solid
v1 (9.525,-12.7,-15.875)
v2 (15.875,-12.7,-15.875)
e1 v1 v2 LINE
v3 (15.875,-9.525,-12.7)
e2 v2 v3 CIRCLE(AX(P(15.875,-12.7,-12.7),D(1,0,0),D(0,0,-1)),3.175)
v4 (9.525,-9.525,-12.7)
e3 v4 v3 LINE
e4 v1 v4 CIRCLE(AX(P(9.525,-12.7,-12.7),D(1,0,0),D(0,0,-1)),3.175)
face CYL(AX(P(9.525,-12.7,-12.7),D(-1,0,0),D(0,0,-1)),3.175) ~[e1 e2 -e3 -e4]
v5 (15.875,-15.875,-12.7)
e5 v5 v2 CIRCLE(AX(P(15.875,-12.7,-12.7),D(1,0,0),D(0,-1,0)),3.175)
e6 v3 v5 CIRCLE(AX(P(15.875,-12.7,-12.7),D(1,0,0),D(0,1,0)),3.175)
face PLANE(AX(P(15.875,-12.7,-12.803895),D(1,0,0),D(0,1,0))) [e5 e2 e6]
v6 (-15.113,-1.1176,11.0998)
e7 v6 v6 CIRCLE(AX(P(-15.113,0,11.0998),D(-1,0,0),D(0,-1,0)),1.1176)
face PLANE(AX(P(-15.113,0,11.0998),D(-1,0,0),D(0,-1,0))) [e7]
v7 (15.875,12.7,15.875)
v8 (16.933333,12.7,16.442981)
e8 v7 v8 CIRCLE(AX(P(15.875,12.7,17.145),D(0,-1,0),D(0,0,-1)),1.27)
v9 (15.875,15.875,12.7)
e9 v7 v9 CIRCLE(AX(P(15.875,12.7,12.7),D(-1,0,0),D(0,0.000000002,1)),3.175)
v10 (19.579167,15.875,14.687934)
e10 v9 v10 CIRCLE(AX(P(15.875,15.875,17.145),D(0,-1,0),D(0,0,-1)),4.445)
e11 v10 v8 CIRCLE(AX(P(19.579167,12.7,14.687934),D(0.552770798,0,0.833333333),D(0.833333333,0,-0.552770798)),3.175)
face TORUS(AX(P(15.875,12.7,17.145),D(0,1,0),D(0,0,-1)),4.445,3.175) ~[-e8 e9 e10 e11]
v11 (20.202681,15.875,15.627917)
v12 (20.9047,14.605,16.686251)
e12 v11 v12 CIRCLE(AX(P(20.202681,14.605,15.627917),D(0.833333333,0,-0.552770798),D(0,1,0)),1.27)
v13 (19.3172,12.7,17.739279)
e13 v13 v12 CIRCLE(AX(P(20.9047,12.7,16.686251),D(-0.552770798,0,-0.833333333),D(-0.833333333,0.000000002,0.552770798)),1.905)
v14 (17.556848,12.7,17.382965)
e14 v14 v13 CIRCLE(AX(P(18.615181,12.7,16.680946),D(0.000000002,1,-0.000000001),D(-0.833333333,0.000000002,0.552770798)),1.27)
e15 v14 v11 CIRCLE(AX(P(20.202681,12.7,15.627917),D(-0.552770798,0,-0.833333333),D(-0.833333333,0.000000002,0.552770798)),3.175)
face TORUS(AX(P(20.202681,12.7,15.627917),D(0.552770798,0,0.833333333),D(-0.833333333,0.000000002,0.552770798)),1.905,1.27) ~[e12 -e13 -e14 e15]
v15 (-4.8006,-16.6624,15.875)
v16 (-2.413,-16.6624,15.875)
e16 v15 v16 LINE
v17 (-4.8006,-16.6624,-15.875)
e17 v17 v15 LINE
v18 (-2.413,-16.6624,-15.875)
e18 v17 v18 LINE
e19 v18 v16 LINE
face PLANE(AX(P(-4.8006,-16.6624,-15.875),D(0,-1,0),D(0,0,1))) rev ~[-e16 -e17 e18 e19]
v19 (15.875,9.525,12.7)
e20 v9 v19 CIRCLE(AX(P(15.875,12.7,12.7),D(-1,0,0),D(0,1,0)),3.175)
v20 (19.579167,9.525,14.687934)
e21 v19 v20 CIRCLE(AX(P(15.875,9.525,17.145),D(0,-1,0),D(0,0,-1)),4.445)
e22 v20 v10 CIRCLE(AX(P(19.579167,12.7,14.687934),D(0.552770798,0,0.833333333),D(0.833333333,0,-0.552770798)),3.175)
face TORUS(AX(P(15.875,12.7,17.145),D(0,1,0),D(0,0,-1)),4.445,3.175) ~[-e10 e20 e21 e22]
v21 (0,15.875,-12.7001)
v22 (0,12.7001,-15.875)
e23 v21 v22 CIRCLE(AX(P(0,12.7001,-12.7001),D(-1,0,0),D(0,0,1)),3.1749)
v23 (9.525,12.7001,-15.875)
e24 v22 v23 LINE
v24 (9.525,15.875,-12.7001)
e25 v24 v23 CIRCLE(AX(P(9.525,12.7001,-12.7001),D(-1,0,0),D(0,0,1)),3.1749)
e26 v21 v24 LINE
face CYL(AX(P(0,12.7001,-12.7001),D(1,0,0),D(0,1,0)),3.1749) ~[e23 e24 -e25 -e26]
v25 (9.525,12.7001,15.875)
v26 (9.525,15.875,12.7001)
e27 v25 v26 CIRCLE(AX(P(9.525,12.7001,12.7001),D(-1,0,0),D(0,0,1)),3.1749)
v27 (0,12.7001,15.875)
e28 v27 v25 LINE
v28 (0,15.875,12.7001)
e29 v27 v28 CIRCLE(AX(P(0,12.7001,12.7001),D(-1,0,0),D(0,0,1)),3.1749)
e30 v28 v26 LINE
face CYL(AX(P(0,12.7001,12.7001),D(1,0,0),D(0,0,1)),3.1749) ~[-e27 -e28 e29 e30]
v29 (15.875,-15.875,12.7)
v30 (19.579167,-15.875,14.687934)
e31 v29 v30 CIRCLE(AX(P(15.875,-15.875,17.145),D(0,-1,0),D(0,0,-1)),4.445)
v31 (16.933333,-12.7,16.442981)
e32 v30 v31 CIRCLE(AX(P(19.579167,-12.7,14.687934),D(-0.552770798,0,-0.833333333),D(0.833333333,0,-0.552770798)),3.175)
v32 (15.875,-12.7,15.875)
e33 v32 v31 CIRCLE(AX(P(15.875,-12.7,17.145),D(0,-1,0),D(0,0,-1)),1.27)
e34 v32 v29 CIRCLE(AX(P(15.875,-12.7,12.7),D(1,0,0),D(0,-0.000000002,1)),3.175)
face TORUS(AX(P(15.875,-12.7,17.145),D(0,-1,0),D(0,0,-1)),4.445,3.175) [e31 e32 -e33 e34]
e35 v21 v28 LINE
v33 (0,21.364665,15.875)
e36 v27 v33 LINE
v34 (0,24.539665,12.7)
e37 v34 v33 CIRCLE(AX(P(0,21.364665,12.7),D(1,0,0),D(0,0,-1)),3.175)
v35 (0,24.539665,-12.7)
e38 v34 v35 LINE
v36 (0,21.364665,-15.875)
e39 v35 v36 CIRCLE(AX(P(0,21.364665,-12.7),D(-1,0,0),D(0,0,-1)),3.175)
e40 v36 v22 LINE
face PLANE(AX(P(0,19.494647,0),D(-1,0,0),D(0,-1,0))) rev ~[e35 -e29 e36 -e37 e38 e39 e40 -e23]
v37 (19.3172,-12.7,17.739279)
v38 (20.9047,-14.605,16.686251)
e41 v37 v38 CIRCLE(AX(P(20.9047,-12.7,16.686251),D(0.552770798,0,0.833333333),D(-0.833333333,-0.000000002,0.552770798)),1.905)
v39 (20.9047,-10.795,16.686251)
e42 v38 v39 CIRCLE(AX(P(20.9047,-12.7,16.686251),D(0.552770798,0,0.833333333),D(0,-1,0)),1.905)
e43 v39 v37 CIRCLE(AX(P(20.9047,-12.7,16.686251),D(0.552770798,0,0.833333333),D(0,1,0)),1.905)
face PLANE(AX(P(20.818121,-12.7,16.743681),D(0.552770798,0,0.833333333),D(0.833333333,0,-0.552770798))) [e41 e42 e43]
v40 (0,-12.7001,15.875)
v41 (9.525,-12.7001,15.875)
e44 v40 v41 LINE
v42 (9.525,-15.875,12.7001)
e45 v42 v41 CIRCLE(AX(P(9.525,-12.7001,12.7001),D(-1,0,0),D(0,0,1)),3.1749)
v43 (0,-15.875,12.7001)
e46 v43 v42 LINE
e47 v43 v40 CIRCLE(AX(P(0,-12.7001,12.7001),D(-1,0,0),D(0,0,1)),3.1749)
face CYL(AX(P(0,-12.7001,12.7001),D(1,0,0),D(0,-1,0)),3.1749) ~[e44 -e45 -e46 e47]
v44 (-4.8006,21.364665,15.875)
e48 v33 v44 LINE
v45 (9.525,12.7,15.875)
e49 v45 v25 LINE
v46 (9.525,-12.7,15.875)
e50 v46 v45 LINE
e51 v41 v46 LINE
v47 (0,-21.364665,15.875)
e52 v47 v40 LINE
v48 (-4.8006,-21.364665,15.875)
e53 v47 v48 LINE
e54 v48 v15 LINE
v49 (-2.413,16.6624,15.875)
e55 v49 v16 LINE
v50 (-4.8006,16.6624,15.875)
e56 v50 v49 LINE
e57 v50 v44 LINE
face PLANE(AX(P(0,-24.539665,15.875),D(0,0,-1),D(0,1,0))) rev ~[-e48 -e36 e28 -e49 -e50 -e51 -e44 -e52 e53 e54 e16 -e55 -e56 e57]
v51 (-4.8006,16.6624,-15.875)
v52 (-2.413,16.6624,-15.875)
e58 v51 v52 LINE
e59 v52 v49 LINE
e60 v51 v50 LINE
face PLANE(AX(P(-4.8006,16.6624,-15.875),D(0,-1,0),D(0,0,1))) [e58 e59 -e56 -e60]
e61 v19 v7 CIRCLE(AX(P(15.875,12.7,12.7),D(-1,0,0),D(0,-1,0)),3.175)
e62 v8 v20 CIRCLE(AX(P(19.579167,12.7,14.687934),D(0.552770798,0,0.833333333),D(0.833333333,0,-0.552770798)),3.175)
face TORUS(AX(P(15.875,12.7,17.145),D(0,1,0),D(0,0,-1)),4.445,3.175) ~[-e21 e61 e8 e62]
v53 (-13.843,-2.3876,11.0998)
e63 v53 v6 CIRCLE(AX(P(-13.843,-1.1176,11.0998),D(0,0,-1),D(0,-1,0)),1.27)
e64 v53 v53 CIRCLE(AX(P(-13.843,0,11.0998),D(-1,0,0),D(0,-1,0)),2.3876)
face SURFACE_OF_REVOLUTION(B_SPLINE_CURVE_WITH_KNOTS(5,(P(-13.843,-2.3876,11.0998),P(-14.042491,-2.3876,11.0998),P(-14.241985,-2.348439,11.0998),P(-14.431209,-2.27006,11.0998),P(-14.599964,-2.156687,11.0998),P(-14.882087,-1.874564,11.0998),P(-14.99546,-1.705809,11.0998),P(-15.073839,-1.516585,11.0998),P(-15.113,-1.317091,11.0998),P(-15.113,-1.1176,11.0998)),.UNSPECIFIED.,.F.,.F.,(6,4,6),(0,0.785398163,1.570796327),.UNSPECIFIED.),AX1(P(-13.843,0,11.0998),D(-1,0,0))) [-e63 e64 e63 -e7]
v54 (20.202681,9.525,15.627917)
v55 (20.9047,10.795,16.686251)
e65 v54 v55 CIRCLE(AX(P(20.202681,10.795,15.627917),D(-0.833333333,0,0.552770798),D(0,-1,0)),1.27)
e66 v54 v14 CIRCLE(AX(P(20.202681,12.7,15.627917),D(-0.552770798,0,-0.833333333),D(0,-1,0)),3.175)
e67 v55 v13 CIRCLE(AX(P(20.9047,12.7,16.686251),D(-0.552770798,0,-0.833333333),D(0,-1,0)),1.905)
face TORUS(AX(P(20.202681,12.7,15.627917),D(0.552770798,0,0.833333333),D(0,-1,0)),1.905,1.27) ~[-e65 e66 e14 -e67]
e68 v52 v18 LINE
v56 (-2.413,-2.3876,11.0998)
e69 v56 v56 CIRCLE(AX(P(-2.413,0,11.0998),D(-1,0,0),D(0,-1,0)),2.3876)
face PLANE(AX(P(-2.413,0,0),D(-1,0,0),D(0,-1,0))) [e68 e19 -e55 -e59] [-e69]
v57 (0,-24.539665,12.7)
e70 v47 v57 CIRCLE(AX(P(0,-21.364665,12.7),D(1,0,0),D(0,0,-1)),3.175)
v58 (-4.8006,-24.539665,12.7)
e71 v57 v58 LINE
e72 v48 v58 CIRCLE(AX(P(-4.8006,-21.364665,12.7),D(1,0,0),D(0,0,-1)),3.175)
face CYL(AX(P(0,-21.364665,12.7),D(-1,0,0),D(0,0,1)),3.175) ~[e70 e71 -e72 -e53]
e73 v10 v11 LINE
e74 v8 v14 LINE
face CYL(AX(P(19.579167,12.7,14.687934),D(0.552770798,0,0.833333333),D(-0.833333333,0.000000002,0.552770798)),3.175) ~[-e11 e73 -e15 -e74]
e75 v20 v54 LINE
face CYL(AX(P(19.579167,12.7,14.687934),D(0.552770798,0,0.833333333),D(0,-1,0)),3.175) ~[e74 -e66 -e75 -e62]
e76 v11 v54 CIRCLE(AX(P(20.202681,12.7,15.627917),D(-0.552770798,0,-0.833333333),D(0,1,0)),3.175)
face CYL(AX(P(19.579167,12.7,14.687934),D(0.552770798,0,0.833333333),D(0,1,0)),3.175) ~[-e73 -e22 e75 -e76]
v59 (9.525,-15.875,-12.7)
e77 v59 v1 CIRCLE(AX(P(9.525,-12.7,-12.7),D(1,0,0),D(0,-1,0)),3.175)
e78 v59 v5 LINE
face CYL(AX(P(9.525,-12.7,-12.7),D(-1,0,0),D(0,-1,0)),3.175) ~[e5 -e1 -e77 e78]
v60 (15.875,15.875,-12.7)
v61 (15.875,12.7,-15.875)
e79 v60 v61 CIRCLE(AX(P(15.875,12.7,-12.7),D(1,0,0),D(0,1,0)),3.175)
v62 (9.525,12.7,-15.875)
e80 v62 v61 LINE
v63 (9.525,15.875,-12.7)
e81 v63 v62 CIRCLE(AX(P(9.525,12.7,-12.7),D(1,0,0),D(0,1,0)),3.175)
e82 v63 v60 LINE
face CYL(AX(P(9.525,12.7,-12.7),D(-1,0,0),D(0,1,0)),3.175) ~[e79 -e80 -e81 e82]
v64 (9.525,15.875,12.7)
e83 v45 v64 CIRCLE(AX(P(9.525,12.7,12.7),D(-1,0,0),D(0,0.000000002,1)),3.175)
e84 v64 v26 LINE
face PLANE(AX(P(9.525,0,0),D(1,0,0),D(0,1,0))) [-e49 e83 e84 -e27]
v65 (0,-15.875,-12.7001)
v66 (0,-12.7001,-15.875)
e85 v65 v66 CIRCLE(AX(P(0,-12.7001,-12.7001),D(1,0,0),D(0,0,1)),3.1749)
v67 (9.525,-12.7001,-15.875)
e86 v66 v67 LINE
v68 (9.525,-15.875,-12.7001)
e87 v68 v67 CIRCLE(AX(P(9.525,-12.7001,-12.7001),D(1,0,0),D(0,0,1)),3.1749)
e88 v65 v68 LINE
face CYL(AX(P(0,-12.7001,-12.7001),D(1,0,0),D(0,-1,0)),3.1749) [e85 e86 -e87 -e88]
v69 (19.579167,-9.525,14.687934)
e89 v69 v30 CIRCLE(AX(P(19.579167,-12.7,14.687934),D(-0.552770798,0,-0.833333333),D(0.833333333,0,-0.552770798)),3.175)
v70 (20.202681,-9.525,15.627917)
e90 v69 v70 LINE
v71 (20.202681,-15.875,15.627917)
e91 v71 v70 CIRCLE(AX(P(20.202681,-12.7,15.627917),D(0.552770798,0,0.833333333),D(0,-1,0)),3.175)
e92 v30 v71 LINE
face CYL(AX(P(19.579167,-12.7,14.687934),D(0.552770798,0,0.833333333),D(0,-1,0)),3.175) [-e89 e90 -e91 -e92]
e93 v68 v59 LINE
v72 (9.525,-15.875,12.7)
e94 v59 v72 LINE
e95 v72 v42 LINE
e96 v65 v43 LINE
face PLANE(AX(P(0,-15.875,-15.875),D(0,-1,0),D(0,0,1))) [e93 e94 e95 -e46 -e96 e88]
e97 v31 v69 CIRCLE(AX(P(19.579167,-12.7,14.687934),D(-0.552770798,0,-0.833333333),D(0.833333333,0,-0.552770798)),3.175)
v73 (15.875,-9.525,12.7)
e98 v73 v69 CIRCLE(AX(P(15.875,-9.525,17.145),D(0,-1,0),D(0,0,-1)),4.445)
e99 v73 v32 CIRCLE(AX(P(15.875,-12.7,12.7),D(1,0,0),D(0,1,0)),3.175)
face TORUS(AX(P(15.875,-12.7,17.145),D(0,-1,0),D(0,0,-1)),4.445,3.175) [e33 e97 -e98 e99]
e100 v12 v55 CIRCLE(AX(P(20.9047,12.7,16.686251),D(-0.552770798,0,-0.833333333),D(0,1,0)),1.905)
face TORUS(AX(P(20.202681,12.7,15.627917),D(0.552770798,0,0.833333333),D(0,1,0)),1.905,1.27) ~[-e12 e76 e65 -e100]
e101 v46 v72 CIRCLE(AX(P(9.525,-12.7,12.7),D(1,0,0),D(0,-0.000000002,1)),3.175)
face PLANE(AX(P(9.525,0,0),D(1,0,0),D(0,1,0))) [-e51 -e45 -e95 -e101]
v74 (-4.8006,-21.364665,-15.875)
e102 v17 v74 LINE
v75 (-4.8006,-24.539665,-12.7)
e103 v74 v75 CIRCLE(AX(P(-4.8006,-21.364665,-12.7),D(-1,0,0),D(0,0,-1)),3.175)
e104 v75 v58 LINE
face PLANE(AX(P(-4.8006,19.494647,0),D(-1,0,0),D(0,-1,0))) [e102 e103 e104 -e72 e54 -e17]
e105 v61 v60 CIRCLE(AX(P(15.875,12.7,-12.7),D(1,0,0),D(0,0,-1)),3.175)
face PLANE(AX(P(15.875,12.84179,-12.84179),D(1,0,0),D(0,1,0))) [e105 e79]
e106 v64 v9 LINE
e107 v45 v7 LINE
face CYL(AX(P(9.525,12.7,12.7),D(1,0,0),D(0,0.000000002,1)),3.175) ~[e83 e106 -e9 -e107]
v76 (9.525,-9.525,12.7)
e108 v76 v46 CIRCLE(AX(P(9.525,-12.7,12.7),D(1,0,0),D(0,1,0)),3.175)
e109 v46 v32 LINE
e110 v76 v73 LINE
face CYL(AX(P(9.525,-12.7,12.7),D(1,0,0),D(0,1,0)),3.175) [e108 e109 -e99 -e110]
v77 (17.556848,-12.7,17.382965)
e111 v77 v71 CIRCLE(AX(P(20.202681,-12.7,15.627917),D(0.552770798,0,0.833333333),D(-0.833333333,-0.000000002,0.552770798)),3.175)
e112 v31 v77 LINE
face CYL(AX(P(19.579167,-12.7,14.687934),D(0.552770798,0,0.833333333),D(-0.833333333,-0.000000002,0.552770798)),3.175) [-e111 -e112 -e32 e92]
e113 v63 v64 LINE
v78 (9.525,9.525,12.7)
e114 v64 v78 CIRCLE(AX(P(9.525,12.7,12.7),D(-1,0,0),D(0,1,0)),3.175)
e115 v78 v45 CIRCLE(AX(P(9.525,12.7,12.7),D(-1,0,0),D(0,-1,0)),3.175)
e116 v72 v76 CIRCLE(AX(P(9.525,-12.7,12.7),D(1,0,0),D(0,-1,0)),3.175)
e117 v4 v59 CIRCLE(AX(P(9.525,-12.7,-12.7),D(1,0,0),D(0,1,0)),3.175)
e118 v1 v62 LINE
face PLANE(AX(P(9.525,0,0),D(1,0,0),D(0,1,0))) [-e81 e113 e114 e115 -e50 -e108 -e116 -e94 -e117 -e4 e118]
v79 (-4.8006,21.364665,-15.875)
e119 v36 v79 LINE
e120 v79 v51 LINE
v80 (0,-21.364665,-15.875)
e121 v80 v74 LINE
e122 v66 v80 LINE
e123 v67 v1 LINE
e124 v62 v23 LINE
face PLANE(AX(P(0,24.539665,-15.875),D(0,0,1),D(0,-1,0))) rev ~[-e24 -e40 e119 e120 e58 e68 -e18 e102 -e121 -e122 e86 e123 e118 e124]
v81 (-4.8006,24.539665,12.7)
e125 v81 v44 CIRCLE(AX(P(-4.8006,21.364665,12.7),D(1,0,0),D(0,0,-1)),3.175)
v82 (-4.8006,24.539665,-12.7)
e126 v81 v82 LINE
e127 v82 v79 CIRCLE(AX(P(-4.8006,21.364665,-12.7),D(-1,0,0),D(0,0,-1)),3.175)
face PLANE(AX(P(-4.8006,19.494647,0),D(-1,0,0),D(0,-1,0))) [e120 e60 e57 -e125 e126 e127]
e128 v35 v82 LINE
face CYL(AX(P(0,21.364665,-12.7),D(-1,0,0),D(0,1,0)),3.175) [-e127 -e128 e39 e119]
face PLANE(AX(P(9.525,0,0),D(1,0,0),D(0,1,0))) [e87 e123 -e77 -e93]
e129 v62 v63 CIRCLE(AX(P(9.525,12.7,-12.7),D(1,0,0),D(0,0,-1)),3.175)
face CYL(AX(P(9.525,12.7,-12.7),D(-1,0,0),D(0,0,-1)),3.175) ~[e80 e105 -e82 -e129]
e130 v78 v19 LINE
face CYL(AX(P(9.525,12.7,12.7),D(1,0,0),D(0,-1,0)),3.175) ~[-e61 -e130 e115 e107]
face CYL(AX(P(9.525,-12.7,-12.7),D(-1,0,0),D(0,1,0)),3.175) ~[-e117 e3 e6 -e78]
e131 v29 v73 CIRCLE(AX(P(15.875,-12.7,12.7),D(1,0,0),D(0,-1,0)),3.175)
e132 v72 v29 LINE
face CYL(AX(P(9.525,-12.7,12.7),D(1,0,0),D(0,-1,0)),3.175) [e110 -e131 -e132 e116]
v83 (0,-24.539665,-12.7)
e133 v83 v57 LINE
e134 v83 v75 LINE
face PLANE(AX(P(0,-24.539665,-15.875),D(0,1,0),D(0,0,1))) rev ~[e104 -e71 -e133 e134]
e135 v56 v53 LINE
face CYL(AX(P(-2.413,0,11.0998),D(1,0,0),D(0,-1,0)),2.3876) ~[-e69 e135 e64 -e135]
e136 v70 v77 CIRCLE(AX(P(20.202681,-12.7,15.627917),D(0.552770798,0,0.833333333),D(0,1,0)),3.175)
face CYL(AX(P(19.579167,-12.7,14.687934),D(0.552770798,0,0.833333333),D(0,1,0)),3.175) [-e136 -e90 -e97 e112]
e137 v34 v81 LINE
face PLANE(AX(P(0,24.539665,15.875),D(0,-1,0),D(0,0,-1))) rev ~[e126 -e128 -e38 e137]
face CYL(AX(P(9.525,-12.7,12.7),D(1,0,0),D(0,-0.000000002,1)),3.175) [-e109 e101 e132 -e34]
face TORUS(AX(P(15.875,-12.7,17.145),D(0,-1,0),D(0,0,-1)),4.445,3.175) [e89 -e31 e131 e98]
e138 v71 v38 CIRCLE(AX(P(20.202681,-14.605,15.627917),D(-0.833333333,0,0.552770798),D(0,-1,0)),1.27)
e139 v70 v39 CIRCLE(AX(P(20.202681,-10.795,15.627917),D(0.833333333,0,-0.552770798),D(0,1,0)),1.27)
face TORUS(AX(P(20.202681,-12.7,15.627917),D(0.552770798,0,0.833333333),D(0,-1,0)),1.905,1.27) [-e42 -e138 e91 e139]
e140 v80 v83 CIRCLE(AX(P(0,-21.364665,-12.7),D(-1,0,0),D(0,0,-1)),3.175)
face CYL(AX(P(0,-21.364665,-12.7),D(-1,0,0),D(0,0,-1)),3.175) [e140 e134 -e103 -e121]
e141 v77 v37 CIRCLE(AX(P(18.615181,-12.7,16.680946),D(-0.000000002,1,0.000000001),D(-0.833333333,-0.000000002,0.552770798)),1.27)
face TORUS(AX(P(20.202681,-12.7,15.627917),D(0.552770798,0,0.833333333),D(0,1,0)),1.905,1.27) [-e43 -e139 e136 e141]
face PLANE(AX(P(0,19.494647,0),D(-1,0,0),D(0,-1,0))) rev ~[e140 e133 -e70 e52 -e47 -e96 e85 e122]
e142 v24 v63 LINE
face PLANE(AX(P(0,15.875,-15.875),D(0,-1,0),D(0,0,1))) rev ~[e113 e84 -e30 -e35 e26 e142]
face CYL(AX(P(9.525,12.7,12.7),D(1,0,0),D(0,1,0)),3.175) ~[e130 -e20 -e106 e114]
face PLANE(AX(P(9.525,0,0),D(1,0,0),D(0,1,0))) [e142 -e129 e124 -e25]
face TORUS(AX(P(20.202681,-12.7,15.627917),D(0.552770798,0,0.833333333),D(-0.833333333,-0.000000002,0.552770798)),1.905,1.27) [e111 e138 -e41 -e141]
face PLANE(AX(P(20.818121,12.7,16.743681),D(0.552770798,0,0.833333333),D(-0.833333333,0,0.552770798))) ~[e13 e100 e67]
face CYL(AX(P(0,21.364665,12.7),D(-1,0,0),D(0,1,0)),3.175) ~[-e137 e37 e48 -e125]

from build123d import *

# Parameters (mm, degrees)
F0_W      = 31.75
F0_H      = 31.75
F1_DEPTH  = 9.525
F7_R      = 1.27
F11_DEPTH = 6.35
F12_R     = 3.1749
F14_DEPTH = 4.8006
F15_W     = 33.3248
F15_H     = 31.75
F16_DEPTH = 2.3876
F17_R     = 2.3876
F18_DEPTH = 12.7
F19_R     = 3.175
F20_R     = 1.27


# Not quite as in the source:
# - a fillet or chamfer is up to 0.001 mm smaller than in the source, because OpenCascade refuses the exact size


with BuildPart() as f1:
    # F0 (on Right) → F1 (new body)
    with BuildSketch(Plane.YZ):
        Rectangle(F0_W, F0_H)
    extrude(amount=F1_DEPTH)

    # F6: sweep along a path in F5
    with BuildLine(Plane.XZ.offset(12.7)) as f6_path:
        Line((9.525, 9.525), (15.875, 9.525))
        ThreePointArc((15.875, 9.525), (19.4783384003, 10.4308096264), (22.225, 12.9328865162))
        Line((22.225, 12.9328865162), (23.5505334947, 14.9312034475))
    # F2 (on face) → F6 (sweep)
    with BuildSketch(Plane.YZ.offset(9.525)):
        with BuildLine():
            ThreePointArc((-15.875, 12.7), (-12.7, 9.525), (-9.525, 12.7))
            ThreePointArc((-9.525, 12.7), (-10.4549359718, 14.9450640323), (-12.7000000057, 15.875))
            ThreePointArc((-12.7000000057, 15.875), (-14.9450640323, 14.9450640282), (-15.875, 12.7))
        make_face()
    sweep(path=f6_path.line)

    # F7
    f7_edges = [f1.edges().sort_by_distance(p)[0] for p in [
        (20.9047, -15.875, 16.686251),
    ]]
    fillet(f7_edges, radius=F7_R)

    # F10: F1 across plane


with BuildPart() as f1_1:
    add(f1.part)
    add(f1.part.mirror(Plane(origin=(0, 0, 15.875), x_dir=(1, 0, 0), z_dir=(0, -1, 0))))

    # F2 (on face) → F11 (join)
    with BuildSketch(Plane.YZ.offset(9.525)):
        with BuildLine():
            ThreePointArc((-9.525, -12.7), (-12.7, -9.525), (-15.875, -12.7))
            ThreePointArc((-15.875, -12.7), (-14.9450640303, -14.9450640303), (-12.7, -15.875))
            ThreePointArc((-12.7, -15.875), (-10.4549359697, -14.9450640303), (-9.525, -12.7))
        make_face()
        with BuildLine():
            ThreePointArc((12.7, -15.875), (14.9450640303, -14.9450640303), (15.875, -12.7))
            ThreePointArc((15.875, -12.7), (10.4549359697, -10.4549359697), (12.7, -15.875))
        make_face()
    extrude(amount=F11_DEPTH)

    # F12 (radius 3.175 in the source; OpenCascade refuses exactly that, so slightly less here)
    f12_edges = [f1_1.edges().sort_by_distance(p)[0] for p in [
        (4.7625, -15.875, 15.875),
        (4.7625, -15.875, -15.875),
        (4.7625, 15.875, -15.875),
        (4.7625, 15.875, 15.875),
    ]]
    fillet(f12_edges, radius=F12_R)

    # F13 (on face) → F14 (join)
    with BuildSketch(Plane(origin=(0, 0, 0), x_dir=(0, -1, 0), z_dir=(-1, 0, 0))):
        with BuildLine():
            Line((-12.7001, 15.875), (-24.5396645936, 15.875))
            Line((-24.5396645936, 15.875), (-24.5396645936, -15.875))
            Line((-24.5396645936, -15.875), (-12.7001, -15.875))
            ThreePointArc((-12.7001, -15.875), (-14.9450933196, -14.9450933196), (-15.875, -12.7001))
            Line((-15.875, -12.7001), (-15.875, 12.7001))
            ThreePointArc((-15.875, 12.7001), (-14.9450933196, 14.9450933196), (-12.7001, 15.875))
        make_face()
        with BuildLine():
            Line((12.7001, 15.875), (-12.7001, 15.875))
            ThreePointArc((-12.7001, 15.875), (-14.9450933196, 14.9450933196), (-15.875, 12.7001))
            Line((-15.875, 12.7001), (-15.875, -12.7001))
            ThreePointArc((-15.875, -12.7001), (-14.9450933196, -14.9450933196), (-12.7001, -15.875))
            Line((-12.7001, -15.875), (12.7001, -15.875))
            ThreePointArc((12.7001, -15.875), (14.9450933196, -14.9450933196), (15.875, -12.7001))
            Line((15.875, -12.7001), (15.875, 12.7001))
            ThreePointArc((15.875, 12.7001), (14.9450933196, 14.9450933196), (12.7001, 15.875))
        make_face()
        with BuildLine():
            Line((24.5396645936, 15.875), (12.7001, 15.875))
            ThreePointArc((12.7001, 15.875), (14.9450933196, 14.9450933196), (15.875, 12.7001))
            Line((15.875, 12.7001), (15.875, -12.7001))
            ThreePointArc((15.875, -12.7001), (14.9450933196, -14.9450933196), (12.7001, -15.875))
            Line((12.7001, -15.875), (24.5396645936, -15.875))
            Line((24.5396645936, -15.875), (24.5396645936, 15.875))
        make_face()
    extrude(amount=F14_DEPTH)

    # F15 (on face) → F16 (cut)
    with BuildSketch(Plane(origin=(-4.8006, 0, 0), x_dir=(0, -1, 0), z_dir=(-1, 0, 0))):
        Rectangle(F15_W, F15_H)
    extrude(amount=-F16_DEPTH, mode=Mode.SUBTRACT)

    # F17 (on face) → F18 (join)
    with BuildSketch(Plane(origin=(-2.413, 0, 0), x_dir=(0, -1, 0), z_dir=(-1, 0, 0))):
        with Locations((0, 11.0998)):
            Circle(F17_R)
    extrude(amount=F18_DEPTH)

    # F19
    f19_edges = [f1_1.edges().sort_by_distance(p)[0] for p in [
        (-2.4003, 24.539665, 15.875),
        (-2.4003, 24.539665, -15.875),
        (-2.4003, -24.539665, -15.875),
        (-2.4003, -24.539665, 15.875),
    ]]
    fillet(f19_edges, radius=F19_R)

    # F20
    f20_edges = [f1_1.edges().sort_by_distance(p)[0] for p in [
        (-15.113, 2.3876, 11.0998),
    ]]
    fillet(f20_edges, radius=F20_R)


solid = f1_1.part
